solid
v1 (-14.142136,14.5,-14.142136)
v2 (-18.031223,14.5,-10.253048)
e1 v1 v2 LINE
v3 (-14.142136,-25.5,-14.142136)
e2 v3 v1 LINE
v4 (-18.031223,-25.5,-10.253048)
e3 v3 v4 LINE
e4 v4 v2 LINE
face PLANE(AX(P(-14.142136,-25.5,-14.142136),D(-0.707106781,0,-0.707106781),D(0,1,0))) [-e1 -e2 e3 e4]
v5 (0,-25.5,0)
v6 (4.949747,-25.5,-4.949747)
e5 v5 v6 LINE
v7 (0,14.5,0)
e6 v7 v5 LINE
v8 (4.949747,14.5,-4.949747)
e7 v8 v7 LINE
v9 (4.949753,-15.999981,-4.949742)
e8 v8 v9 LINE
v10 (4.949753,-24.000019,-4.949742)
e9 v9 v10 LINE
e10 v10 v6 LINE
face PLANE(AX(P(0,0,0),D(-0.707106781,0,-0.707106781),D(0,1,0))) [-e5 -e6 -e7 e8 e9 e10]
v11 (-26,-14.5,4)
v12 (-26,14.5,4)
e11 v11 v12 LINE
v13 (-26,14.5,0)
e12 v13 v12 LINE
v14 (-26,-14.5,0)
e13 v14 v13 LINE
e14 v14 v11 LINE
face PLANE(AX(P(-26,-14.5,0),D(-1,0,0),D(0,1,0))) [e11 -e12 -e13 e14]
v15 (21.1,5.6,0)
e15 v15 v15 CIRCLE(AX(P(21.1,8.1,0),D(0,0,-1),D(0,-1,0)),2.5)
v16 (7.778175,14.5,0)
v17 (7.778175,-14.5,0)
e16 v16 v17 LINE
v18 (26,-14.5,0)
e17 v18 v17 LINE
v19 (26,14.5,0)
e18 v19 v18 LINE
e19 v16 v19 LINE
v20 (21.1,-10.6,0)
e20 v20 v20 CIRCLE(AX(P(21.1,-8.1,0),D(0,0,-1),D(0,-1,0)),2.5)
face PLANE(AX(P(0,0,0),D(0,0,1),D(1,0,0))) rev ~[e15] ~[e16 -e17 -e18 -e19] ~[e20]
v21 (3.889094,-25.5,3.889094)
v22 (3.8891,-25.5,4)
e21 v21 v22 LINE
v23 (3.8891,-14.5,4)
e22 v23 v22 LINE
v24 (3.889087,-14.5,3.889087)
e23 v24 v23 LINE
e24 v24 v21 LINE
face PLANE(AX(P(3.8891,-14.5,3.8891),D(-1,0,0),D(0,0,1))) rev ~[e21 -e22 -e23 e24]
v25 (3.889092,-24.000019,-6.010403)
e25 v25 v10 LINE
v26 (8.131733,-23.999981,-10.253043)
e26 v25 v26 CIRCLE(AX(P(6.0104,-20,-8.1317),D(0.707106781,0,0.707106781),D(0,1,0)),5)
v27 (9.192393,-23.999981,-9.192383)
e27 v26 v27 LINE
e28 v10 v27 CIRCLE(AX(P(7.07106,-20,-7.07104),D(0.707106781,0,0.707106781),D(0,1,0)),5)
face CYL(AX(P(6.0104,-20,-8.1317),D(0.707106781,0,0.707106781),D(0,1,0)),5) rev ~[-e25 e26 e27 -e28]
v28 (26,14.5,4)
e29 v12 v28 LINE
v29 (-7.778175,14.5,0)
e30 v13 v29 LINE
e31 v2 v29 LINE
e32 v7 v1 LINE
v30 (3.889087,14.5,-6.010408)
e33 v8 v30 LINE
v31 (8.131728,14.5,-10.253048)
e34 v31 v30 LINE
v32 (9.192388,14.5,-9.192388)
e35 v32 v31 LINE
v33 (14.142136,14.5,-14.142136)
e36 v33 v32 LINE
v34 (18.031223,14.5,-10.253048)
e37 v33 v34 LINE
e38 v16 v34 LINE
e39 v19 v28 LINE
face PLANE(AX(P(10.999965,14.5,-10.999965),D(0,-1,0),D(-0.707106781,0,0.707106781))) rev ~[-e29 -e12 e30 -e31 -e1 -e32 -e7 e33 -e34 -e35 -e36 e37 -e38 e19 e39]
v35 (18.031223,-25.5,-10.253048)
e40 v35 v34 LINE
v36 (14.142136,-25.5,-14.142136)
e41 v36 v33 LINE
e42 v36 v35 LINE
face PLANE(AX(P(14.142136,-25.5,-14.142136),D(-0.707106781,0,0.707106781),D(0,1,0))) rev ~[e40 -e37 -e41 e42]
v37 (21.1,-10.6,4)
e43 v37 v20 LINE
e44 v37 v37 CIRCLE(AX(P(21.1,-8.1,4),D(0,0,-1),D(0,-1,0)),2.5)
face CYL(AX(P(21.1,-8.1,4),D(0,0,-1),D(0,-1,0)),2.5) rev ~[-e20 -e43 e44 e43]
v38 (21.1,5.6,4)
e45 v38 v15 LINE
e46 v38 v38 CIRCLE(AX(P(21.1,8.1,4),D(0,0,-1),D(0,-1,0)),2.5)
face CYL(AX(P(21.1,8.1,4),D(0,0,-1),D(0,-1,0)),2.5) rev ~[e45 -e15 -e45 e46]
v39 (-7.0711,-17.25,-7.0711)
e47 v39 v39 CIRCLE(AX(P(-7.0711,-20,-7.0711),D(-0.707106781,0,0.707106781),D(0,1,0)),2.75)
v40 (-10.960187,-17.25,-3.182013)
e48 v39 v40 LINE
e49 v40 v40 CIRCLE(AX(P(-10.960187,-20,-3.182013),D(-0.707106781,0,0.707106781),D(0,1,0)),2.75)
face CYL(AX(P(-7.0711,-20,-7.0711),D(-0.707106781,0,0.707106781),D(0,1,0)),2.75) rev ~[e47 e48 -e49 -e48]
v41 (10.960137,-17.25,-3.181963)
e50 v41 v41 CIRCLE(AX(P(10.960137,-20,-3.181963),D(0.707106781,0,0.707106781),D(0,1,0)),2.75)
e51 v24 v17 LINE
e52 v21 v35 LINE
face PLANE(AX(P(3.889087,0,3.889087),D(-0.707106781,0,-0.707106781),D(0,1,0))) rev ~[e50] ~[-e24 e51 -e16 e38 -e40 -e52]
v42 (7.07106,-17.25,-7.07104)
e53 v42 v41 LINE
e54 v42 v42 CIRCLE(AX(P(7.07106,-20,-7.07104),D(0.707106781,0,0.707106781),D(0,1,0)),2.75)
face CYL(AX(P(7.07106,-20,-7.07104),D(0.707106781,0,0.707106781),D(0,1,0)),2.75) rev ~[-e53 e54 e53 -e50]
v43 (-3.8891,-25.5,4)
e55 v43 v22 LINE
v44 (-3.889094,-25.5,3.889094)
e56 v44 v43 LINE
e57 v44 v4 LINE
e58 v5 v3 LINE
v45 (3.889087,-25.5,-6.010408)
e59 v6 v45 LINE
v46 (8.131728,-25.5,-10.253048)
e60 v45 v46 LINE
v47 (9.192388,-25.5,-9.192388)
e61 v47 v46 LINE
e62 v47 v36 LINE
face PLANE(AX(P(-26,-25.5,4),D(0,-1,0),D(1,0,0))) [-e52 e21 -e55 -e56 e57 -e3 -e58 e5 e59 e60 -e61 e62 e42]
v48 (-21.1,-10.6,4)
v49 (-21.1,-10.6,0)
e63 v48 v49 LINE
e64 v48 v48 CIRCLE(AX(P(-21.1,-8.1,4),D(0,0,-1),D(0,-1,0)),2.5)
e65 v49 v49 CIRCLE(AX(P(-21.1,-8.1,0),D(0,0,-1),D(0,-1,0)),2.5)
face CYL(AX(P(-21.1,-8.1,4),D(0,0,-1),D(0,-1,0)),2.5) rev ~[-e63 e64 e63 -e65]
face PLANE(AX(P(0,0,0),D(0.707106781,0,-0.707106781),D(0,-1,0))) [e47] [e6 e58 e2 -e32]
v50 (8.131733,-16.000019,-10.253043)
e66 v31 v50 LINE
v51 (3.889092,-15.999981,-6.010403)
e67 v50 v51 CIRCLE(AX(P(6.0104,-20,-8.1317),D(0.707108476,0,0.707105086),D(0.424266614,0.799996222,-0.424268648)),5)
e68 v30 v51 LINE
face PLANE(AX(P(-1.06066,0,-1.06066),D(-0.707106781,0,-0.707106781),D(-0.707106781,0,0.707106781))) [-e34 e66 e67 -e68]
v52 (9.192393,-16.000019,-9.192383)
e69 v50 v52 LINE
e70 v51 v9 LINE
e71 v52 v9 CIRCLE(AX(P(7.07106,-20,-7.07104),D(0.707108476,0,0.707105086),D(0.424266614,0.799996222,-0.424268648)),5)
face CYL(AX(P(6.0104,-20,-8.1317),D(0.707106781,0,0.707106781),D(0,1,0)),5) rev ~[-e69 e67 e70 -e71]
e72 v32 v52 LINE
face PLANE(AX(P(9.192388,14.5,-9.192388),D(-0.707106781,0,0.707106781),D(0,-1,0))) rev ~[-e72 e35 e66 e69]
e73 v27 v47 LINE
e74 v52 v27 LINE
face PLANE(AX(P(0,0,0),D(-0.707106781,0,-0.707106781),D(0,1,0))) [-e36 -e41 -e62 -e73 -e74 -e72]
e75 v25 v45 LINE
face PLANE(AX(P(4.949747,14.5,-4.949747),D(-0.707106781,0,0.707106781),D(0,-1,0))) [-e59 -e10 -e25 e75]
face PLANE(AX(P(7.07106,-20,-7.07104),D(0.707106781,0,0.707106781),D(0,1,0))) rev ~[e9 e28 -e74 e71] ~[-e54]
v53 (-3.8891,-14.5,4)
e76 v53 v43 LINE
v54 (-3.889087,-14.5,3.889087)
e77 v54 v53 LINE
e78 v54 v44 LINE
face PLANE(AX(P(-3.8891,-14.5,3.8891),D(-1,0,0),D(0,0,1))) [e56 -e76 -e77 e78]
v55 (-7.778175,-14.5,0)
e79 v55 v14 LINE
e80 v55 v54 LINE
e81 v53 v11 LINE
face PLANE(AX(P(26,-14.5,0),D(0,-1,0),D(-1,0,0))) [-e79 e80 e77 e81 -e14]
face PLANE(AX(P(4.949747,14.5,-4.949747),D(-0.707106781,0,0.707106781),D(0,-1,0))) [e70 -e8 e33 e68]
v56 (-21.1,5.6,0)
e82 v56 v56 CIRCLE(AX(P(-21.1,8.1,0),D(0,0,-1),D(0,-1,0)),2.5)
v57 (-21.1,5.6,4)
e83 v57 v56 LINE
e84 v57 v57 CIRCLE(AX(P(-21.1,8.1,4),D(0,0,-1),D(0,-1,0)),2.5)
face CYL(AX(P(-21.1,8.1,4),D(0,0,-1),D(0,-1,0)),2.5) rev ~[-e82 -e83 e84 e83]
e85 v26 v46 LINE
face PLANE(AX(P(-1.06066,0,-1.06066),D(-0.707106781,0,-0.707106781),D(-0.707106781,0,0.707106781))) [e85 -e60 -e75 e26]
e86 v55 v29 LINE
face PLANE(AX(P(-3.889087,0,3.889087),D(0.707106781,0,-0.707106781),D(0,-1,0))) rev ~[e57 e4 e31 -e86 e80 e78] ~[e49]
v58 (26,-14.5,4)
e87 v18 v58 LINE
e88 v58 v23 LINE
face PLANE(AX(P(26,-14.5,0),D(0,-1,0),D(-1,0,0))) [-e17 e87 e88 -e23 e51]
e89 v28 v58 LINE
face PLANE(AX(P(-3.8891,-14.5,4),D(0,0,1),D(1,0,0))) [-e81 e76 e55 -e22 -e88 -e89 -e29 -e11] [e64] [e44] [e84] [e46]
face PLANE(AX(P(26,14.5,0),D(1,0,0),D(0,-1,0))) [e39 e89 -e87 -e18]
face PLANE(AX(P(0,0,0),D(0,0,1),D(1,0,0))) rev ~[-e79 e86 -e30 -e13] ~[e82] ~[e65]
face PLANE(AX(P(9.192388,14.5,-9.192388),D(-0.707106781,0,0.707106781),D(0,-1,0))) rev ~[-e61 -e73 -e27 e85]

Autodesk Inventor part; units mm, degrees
ref_plane "YZ Plane" through (0, 0, 0) normal (1, 0, 0) x (0, 1, 0)
sketch "Sketch1" plane through (0, 0, 0) normal (0, 0, 1) x (1, 0, 0)
  line L0 (-26, 14.5) -> (26, 14.5)
  line L1 (26, 14.5) -> (26, -14.5)
  line L2 (26, -14.5) -> (-26, -14.5)
  line L3 (-26, -14.5) -> (-26, 14.5)
  line L4 (-26, 14.5) -> (26, -14.5) construction
  line L5 (26, 14.5) -> (-26, -14.5) construction
  point P0 (0, 0)
  dimension "d0" = 52
  dimension "d1" = 29
extrude "Extrusion1" add sketch "Sketch1" along normal blind 4
sketch "Sketch2" plane through (0, 0, 4) normal (0, 0, 1) x (1, 0, 0)
  line L0 (-21.1, 8.1) -> (21.1, 8.1)
  line L1 (21.1, 8.1) -> (21.1, -8.1)
  line L2 (21.1, -8.1) -> (-21.1, -8.1)
  line L3 (-21.1, -8.1) -> (-21.1, 8.1)
  line L4 (-21.1, 8.1) -> (21.1, -8.1) construction
  line L5 (21.1, 8.1) -> (-21.1, -8.1) construction
  point P0 (0, 0)
  dimension "d4" = 42.2
  dimension "d5" = 16.2
hole "Hole1" at (-21.1, 8.1, 4) at (21.1, 8.1, 4) at (21.1, -8.1, 4) at (-21.1, -8.1, 4) direction (0, 0, -1) diameter 5 end through all
ref_plane "Work Plane1" through (0, -14.5, 0) normal (1, 0, 0) x (0, 0, -1)
ref_plane "Work Plane2" through (0, 0, 0) normal (0.7071068, 0, -0.7071068) x (0, -1, 0)
ref_plane "Work Plane3" through (0, 0, 0) normal (-0.7071068, 0, -0.7071068) x (0, 1, 0)
sketch "Sketch4" plane through (0, 0, 0) normal (-0.7071068, 0, -0.7071068) x (0, 1, 0)
  line L0 (14.5, 15.5563) -> (14.5, -21.2132) projected
  line L1 (14.5, 0) -> (-25.5, 0)
  line L2 (-25.5, 0) -> (-25.5, 20)
  line L3 (-25.5, 20) -> (14.5, 20)
  line L4 (14.5, 20) -> (14.5, 0)
  point P0 (0, 0)
  dimension "d14" = 40
  dimension "d15" = 20
extrude "Extrusion2" add sketch "Sketch4" against normal blind 5.5
sketch "Sketch5" plane through (0, 0, 0) normal (0.7071068, 0, -0.7071068) x (0, -1, 0)
  line L0 (-14.5, -21.2132) -> (-14.5, 15.5563) projected
  line L1 (-14.5, 0) -> (25.5, 0)
  line L2 (25.5, 0) -> (25.5, 20)
  line L3 (25.5, 20) -> (-14.5, 20)
  line L4 (-14.5, 20) -> (-14.5, 0)
  point P0 (0, 0)
  dimension "d18" = 40
  dimension "d19" = 20
extrude "Extrusion3" add sketch "Sketch5" against normal blind 5.5
sketch "Sketch7" plane through (0, 0, 0) normal (-0.7071068, 0, -0.7071068) x (-0.7071068, 0, 0.7071068)
  line L0 (-20, 14.5) -> (0, 14.5) projected
  line L1 (-13, 14.5) -> (-13, -25.5)
  line L2 (0, -25.5) -> (-20, -25.5) projected
  line L3 (-7, 14.5) -> (-7, -25.5)
  line L4 (-20, -25.5) -> (-20, 14.5) projected
  line L5 (-13, 14.5) -> (-7, 14.5)
  line L6 (-13, -25.5) -> (-7, -25.5)
  point P0 (0, 0)
  dimension "d22" = 7
  dimension "d23" = 13
extrude "Extrusion4" add sketch "Sketch7" along normal blind 1.5 contours L0 L3 L2 L1
sketch "Sketch8" plane through (-26, -14.5, 4) normal (0, -1, 0) x (1, 0, 0)
  line L0 (22.1109, -0.1109) -> (26, -4)
  line L1 (26, -4) -> (29.8891, -0.1109)
  line L2 (29.8891, -0.1109) -> (29.8891, 0)
  line L3 (0, 0) -> (52, 0) projected
  line L4 (22.1109, -0.1109) -> (26, -4) projected
  line L5 (22.1109, -0.1109) -> (22.1109, 0)
  line L6 (22.1109, 0) -> (29.8891, 0)
extrude "Extrusion5" add sketch "Sketch8" along normal blind 11
sketch "Sketch9" plane through (-1.0607, 0, -1.0607) normal (-0.7071068, 0, -0.7071068) x (-0.7071068, 0, 0.7071068)
  line L0 (-13, -25.5) -> (-7, -25.5) projected
  line L1 (-20, -25.5) -> (-20, 14.5) projected
  point P0 (0, 0)
  point P1 (-10, -20)
  dimension "d28" = 5.5
  dimension "d29" = 10
hole "Hole2" at (6.0104, -20, -8.1317) direction (0.7071068, 0, 0.7071068) diameter 5.5 end through all counterbore diameter 10 counterbore depth 1.5
sketch "Sketch10" plane through (0, 0, 0) normal (0.7071068, 0, -0.7071068) x (-0.7071068, 0, -0.7071068)
  line L0 (20, -25.5) -> (20, 14.5) projected
  line L1 (0, -25.5) -> (20, -25.5) projected
  point P0 (0, 0)
  point P1 (10, -20)
  dimension "d37" = 10
  dimension "d38" = 5.5
hole "Hole3" at (-7.0711, -20, -7.0711) direction (-0.7071068, 0, 0.7071068) diameter 5.5 end through all
properties part number "Estrutura - suporteCam"
